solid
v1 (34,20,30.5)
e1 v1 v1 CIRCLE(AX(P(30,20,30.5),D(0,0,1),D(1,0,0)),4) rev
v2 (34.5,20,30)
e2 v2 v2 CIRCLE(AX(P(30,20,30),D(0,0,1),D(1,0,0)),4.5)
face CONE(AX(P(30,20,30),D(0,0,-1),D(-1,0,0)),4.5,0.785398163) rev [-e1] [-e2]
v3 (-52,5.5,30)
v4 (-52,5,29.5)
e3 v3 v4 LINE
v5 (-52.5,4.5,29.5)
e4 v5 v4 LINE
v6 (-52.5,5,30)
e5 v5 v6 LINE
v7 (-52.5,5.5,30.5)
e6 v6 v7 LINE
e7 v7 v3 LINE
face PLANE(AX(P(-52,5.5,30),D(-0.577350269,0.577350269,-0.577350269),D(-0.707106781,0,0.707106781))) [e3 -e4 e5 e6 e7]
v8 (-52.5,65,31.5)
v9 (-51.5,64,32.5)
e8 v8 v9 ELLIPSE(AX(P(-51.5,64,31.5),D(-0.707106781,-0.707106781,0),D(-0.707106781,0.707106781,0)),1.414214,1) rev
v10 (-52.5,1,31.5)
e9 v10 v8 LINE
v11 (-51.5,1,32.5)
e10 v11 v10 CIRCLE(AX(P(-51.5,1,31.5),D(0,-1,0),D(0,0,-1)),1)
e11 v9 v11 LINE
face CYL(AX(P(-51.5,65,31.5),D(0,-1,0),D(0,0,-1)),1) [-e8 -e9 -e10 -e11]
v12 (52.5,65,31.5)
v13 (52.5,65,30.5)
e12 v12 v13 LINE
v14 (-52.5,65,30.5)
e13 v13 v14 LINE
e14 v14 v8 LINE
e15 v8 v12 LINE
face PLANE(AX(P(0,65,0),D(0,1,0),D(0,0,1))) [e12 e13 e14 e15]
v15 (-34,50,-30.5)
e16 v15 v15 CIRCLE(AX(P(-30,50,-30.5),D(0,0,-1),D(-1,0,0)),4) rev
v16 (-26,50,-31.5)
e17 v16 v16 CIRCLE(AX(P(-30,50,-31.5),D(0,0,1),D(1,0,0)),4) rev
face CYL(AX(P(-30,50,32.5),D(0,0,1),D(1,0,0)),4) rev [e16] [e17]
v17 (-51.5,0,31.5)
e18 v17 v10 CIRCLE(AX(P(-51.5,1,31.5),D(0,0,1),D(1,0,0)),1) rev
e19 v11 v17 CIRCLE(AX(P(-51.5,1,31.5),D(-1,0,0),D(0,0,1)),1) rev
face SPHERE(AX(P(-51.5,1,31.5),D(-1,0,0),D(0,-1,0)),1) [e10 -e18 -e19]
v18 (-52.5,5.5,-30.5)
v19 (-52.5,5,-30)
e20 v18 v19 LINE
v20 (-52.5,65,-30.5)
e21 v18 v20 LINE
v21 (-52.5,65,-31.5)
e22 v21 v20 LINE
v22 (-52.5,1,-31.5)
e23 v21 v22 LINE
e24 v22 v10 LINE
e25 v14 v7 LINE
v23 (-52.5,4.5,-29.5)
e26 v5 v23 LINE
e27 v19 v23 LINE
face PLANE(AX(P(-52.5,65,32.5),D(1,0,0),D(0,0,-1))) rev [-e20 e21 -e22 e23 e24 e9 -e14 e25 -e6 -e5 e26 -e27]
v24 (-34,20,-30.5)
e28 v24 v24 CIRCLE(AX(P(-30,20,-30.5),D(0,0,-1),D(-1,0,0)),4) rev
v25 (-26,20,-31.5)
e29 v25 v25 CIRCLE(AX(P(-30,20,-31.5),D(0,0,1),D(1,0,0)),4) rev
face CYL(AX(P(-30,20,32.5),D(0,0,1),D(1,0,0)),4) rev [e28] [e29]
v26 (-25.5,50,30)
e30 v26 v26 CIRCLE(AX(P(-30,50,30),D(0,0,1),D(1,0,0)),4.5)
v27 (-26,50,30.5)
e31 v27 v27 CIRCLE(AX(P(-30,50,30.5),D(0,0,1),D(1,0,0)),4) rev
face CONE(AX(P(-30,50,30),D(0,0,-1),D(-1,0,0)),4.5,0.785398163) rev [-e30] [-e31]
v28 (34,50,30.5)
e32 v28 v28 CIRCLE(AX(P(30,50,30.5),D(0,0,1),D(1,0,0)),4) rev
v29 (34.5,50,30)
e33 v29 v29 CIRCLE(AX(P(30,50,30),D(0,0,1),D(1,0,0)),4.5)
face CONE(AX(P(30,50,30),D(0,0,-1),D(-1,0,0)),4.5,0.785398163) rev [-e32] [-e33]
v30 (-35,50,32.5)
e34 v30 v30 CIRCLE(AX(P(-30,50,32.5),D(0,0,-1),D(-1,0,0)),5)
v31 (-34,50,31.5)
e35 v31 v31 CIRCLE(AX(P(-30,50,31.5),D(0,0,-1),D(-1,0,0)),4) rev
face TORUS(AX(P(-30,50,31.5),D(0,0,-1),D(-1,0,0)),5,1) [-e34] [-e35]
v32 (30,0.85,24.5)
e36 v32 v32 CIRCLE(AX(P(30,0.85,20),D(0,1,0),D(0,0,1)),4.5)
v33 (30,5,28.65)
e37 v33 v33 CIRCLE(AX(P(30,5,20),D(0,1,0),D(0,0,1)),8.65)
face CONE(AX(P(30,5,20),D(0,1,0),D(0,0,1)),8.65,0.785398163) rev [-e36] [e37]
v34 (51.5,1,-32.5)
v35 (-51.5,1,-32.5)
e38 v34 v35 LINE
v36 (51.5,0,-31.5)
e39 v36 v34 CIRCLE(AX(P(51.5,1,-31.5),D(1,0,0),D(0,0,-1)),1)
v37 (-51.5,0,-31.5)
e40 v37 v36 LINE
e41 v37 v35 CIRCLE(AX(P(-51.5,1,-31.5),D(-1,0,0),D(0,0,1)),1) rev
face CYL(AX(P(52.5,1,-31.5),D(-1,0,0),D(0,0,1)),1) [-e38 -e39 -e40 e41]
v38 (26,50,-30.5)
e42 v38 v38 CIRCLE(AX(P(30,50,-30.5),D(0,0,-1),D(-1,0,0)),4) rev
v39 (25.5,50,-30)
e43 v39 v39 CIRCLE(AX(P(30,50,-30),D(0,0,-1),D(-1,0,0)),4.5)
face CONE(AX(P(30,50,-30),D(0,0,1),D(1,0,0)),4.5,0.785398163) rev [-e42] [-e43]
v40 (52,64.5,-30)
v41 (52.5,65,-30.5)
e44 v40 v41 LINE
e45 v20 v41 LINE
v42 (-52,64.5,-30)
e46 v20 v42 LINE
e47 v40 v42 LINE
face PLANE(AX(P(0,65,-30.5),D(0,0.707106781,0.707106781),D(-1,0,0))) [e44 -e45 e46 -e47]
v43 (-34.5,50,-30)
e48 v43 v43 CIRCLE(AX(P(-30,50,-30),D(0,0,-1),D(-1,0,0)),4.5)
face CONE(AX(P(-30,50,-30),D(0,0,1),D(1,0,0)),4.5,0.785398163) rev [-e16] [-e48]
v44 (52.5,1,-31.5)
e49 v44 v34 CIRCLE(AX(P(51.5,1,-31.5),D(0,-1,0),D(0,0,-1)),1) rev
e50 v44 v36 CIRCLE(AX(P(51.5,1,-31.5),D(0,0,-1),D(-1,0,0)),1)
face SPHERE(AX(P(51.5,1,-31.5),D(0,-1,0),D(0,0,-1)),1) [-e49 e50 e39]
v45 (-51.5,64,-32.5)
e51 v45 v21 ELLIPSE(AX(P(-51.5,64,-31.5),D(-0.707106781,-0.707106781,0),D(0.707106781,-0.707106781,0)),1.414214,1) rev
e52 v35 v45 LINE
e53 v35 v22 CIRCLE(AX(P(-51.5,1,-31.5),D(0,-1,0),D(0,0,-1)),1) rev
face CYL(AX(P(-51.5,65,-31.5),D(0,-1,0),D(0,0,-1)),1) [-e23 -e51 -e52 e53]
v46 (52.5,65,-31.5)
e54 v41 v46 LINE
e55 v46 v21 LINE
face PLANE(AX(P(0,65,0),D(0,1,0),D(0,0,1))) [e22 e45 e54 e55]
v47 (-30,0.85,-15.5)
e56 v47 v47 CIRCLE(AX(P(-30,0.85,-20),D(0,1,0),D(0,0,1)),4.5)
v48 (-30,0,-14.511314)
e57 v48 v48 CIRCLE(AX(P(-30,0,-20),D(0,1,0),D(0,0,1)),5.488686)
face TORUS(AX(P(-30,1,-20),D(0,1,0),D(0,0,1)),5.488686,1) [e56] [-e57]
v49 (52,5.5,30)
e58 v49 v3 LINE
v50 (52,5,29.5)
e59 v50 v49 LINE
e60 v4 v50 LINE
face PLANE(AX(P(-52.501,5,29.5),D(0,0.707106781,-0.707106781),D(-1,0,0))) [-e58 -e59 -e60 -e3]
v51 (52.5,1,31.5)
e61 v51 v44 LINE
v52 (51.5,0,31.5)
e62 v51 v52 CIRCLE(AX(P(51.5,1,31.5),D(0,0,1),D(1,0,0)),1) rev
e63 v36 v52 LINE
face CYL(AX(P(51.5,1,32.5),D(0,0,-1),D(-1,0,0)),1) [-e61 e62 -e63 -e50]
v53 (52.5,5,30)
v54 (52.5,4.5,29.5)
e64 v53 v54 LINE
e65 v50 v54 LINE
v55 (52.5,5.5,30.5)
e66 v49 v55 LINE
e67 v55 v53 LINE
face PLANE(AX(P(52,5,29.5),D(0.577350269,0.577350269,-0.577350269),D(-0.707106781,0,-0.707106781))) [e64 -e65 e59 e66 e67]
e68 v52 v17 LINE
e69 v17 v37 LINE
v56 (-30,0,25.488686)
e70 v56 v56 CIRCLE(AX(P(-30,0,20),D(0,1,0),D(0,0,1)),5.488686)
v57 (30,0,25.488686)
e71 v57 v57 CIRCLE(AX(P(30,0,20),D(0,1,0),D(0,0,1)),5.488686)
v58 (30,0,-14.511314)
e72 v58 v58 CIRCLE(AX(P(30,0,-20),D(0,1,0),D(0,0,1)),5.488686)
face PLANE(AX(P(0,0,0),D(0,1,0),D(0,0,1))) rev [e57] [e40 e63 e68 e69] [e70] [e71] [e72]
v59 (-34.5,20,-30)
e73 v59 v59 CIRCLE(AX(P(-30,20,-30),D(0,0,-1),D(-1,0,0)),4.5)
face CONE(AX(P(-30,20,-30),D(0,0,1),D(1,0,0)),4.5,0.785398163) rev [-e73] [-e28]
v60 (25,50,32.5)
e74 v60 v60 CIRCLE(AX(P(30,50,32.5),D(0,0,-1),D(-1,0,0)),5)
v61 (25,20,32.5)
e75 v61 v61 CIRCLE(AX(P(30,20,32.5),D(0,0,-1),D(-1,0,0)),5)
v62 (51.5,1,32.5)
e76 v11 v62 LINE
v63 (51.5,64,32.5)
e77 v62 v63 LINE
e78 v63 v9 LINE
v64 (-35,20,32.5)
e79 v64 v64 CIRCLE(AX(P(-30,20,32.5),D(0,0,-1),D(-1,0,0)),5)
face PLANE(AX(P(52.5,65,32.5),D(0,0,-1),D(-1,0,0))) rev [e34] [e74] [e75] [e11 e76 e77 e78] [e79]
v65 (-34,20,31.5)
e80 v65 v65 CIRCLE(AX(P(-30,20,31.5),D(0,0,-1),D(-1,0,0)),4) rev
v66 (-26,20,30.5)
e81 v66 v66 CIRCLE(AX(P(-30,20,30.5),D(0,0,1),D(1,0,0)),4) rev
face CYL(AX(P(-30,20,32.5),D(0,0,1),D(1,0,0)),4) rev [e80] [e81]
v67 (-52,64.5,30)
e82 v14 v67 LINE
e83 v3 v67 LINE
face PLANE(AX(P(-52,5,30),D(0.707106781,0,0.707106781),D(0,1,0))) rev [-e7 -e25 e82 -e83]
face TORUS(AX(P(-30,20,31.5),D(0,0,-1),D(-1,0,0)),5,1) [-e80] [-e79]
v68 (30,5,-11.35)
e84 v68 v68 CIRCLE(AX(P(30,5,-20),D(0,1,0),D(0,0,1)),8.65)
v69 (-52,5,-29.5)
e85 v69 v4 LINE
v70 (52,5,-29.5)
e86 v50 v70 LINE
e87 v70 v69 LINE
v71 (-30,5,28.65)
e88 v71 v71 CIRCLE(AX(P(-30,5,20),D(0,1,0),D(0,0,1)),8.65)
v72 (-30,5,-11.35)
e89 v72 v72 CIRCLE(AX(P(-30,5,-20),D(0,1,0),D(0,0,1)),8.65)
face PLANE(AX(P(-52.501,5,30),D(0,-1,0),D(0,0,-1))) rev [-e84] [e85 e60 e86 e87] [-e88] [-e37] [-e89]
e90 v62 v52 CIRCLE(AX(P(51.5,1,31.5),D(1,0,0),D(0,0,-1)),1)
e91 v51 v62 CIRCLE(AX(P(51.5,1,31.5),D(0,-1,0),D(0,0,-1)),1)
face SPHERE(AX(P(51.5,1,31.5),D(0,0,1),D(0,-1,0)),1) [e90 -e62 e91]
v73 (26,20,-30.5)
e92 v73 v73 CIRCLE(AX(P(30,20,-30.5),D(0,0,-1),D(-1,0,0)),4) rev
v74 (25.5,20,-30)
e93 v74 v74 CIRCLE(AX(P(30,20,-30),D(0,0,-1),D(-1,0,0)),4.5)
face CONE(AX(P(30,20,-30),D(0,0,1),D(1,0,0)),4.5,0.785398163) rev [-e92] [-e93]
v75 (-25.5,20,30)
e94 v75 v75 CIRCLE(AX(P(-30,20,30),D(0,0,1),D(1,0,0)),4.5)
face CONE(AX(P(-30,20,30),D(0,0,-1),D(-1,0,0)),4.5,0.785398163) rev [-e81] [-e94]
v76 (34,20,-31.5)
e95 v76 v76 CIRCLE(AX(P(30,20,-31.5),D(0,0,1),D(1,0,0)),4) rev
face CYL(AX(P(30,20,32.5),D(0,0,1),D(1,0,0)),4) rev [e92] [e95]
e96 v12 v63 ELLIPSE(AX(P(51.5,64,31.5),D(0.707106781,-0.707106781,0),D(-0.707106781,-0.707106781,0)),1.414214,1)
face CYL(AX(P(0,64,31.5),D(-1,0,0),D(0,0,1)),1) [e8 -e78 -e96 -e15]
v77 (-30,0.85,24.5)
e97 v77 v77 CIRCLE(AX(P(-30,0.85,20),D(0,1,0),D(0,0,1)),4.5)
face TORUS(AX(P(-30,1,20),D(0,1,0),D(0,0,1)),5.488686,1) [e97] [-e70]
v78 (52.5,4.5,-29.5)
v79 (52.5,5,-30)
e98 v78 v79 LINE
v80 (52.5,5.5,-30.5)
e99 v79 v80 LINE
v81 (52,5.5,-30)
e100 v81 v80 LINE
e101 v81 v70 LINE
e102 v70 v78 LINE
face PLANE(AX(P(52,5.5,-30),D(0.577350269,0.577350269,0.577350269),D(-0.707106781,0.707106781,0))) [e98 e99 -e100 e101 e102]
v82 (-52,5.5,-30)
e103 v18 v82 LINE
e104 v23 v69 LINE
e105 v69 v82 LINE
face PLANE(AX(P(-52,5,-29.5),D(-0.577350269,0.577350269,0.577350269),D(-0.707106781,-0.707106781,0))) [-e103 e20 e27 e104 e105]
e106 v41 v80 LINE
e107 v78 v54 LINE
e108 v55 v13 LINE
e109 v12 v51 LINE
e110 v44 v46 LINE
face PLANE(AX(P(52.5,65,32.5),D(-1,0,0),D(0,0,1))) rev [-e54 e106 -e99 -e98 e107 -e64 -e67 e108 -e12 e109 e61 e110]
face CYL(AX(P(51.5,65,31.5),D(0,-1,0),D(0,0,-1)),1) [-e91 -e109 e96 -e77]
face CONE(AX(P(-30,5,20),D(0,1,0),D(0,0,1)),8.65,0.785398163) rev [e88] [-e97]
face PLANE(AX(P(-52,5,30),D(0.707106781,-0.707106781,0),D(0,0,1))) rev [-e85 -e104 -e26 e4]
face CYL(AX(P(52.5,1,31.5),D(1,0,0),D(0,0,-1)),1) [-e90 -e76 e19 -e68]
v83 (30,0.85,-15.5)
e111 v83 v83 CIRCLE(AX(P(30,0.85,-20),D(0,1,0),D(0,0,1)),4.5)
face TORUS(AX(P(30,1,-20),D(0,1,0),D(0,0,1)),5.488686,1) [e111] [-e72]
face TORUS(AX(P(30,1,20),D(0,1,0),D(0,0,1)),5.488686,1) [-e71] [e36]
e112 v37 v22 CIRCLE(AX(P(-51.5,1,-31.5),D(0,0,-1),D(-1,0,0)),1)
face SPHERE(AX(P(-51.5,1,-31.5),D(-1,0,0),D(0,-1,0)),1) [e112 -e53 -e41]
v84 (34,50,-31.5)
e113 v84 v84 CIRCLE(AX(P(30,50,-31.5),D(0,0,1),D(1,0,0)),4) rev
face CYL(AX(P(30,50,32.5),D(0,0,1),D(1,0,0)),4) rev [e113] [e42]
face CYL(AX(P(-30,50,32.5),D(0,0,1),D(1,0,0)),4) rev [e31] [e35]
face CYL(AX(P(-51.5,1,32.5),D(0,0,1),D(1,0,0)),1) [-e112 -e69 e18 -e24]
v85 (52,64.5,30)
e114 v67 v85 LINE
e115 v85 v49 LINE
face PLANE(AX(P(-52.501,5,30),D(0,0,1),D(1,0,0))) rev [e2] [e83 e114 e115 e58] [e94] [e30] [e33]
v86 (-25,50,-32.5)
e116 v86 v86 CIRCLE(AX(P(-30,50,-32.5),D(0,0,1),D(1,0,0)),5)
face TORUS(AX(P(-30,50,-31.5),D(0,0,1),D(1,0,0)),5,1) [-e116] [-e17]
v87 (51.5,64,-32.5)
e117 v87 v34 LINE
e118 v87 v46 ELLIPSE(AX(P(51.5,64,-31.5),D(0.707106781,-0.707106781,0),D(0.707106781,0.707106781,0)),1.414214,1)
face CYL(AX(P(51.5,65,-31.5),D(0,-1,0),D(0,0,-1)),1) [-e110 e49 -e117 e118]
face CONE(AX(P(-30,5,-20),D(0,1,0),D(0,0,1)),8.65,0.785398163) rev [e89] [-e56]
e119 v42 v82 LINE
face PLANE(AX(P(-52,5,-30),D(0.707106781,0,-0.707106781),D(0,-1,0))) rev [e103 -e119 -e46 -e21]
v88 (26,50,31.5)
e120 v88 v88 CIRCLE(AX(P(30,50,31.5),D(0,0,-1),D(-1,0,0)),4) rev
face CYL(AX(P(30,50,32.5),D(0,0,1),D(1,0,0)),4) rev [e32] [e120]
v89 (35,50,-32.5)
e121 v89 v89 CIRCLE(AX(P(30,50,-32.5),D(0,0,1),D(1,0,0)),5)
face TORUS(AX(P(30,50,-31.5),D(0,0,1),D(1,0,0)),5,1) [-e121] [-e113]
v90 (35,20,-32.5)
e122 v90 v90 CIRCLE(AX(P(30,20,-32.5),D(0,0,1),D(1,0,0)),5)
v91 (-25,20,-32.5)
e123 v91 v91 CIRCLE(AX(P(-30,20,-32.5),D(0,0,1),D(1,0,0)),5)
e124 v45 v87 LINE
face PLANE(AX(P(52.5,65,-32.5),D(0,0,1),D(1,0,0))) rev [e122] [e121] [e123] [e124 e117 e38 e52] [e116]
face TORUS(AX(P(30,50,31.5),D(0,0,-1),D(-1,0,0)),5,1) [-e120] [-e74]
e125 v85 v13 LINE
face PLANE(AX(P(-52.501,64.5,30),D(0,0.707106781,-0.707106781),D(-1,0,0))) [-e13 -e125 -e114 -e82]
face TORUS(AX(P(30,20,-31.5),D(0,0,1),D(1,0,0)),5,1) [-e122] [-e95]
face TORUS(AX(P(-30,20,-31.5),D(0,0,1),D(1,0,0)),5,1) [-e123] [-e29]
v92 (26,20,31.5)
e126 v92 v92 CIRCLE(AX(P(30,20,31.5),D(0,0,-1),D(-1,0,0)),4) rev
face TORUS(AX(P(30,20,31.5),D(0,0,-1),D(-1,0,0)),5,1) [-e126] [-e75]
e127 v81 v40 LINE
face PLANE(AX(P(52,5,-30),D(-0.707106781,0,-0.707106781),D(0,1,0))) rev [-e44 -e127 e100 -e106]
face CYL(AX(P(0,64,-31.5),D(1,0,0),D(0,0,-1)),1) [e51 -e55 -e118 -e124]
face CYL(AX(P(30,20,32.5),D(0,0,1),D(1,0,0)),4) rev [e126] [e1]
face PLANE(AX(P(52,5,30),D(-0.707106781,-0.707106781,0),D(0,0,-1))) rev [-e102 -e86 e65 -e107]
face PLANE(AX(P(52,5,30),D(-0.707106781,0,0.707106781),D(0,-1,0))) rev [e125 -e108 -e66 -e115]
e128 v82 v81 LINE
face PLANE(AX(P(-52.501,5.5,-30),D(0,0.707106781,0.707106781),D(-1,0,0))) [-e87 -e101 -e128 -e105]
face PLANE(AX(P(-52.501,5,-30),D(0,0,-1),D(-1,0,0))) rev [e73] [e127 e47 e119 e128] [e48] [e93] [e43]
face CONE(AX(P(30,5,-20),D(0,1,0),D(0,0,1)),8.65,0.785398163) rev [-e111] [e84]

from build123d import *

# Parameters (mm, degrees)
SZKIC1_W                    = 105
SZKIC1_H                    = 65
DODANIE_WYCI_GNI_CIE1_DEPTH = 65
WYTNIJ_WYCI_GNI_CIE1_REACH  = 129.696
SZKIC2_W                    = 60
SZKIC2_H                    = 60
OTWORY_USTALAJ_CE_8_0MM2_D  = 8
ZAOKR_GLENIE1_R             = 1
SFAZOWANIE1_SIZE            = 0.5


with BuildPart() as part:
    # Szkic1 → Dodanie-wyciągnięcie1 (new body)
    with BuildSketch(Plane(origin=(0, 0, 0), x_dir=(1, 0, 0), z_dir=(0, 1, 0))):
        Rectangle(SZKIC1_W, SZKIC1_H)
    extrude(amount=DODANIE_WYCI_GNI_CIE1_DEPTH)

    # Szkic2 → Wytnij-wyciągnięcie1 (cut, up to next)
    with BuildSketch(Plane(origin=(52.5, 0, 0), x_dir=(0, 0, -1), z_dir=(1, 0, 0)), mode=Mode.PRIVATE) as wytnij_wyci_gni_cie1_sk1:
        with Locations((0, 35)):
            Rectangle(SZKIC2_W, SZKIC2_H)
    wytnij_wyci_gni_cie1_tool1 = extrude(wytnij_wyci_gni_cie1_sk1.sketch, amount=-WYTNIJ_WYCI_GNI_CIE1_REACH, mode=Mode.PRIVATE) & part.part
    add(wytnij_wyci_gni_cie1_tool1.solids().sort_by_distance((52.5, 35, 0))[0], mode=Mode.SUBTRACT)

    # Szkic5 → Pogłębienie stożkowe pod M8 Śrubę z łbem soczewkowym1 (revolve, cut)
    with BuildSketch(Plane(origin=(-30, 5, -20), x_dir=(0, 0, 1), z_dir=(1, 0, 0))):
        Polygon((0, 0), (0, 5), (4.5, 5), (4.5, 4.15), (8.65, 0), align=None)
    pog_bienie_sto_kowe_pod_m8_rub_z_bem = revolve(axis=Axis((-30, 11.35, -20), (0, -1, 0)), mode=Mode.SUBTRACT)

    # Lustro1: Pogłębienie stożkowe pod M8 Śrubę z łbem soczewkowym1 across plane
    add(pog_bienie_sto_kowe_pod_m8_rub_z_bem.mirror(Plane(origin=(0, 0, 0), x_dir=(0, 0, 1), z_dir=(1, 0, 0))), mode=Mode.SUBTRACT)

    # Lustro2: Pogłębienie stożkowe pod M8 Śrubę z łbem soczewkowym1 across plane
    add(pog_bienie_sto_kowe_pod_m8_rub_z_bem.mirror(Plane.XY), mode=Mode.SUBTRACT)

    # Lustro2 copy 1 sketch → Lustro2 copy 1 (revolve, cut)
    with BuildSketch(Plane(origin=(30, 5, 20), x_dir=(0, 0, -1), z_dir=(-1, 0, 0))):
        Polygon((0, 0), (0, 5), (4.5, 5), (4.5, 4.15), (8.65, 0), align=None)
    revolve(axis=Axis((30, 11.35, 20), (0, -1, 0)), mode=Mode.SUBTRACT)

    # Otwory ustalające Ø8.0mm2 (through all)
    with Locations(Plane.XY.offset(32.5)):
        with Locations((-30, 50), (30, 50), (30, 20), (-30, 20)):
            Hole(OTWORY_USTALAJ_CE_8_0MM2_D / 2)

    # Zaokrąglenie1
    # the kernel refuses this fillet: 1 mm, written as the material it takes off along each edge
    with BuildSketch(Plane(origin=(-51.5, 1, -31.5), x_dir=(-1, 0, 0), z_dir=(0, -1, 0))) as zaokr_glenie1_piece_1_section:
        Polygon((0, 0), (ZAOKR_GLENIE1_R * 1.02, 0), (ZAOKR_GLENIE1_R * 1.02, ZAOKR_GLENIE1_R * 1.02), (0, ZAOKR_GLENIE1_R * 1.02), align=None)
    zaokr_glenie1_piece_1 = extrude(amount=ZAOKR_GLENIE1_R * 1.02, mode=Mode.PRIVATE)
    zaokr_glenie1_piece_1 = zaokr_glenie1_piece_1 - Plane(origin=(-51.5, 1, -31.5), x_dir=(0.7071067811865477, 0, 0.7071067811865475), z_dir=(0, -1, 0)) * Sphere(ZAOKR_GLENIE1_R, mode=Mode.PRIVATE)
    add(zaokr_glenie1_piece_1, mode=Mode.SUBTRACT)
    with BuildSketch(Plane(origin=(51.5, 1, -31.5), x_dir=(0, -1, 0), z_dir=(1, 0, 0))) as zaokr_glenie1_piece_2_section:
        Polygon((0, 0), (ZAOKR_GLENIE1_R * 1.02, 0), (ZAOKR_GLENIE1_R * 1.02, ZAOKR_GLENIE1_R * 1.02), (0, ZAOKR_GLENIE1_R * 1.02), align=None)
    zaokr_glenie1_piece_2 = extrude(amount=ZAOKR_GLENIE1_R * 1.02, mode=Mode.PRIVATE)
    zaokr_glenie1_piece_2 = zaokr_glenie1_piece_2 - Plane(origin=(51.5, 1, -31.5), x_dir=(0, 0.7071067811865475, 0.7071067811865475), z_dir=(1, 0, 0)) * Sphere(ZAOKR_GLENIE1_R, mode=Mode.PRIVATE)
    add(zaokr_glenie1_piece_2, mode=Mode.SUBTRACT)
    with BuildSketch(Plane(origin=(51.5, 1, 31.5), x_dir=(1, 0, 0), z_dir=(0, 0, 1))) as zaokr_glenie1_piece_3_section:
        Polygon((0, 0), (ZAOKR_GLENIE1_R * 1.02, 0), (ZAOKR_GLENIE1_R * 1.02, -ZAOKR_GLENIE1_R * 1.02), (0, -ZAOKR_GLENIE1_R * 1.02), align=None)
    zaokr_glenie1_piece_3 = extrude(amount=ZAOKR_GLENIE1_R * 1.02, mode=Mode.PRIVATE)
    zaokr_glenie1_piece_3 = zaokr_glenie1_piece_3 - Plane(origin=(51.5, 1, 31.5), x_dir=(-0.7071067811865475, 0.7071067811865475, 0), z_dir=(0, 0, 1)) * Sphere(ZAOKR_GLENIE1_R, mode=Mode.PRIVATE)
    add(zaokr_glenie1_piece_3, mode=Mode.SUBTRACT)
    with BuildSketch(Plane(origin=(-51.5, 1, 31.5), x_dir=(0, -1, 0), z_dir=(0, 0, 1))) as zaokr_glenie1_piece_4_section:
        Polygon((0, 0), (ZAOKR_GLENIE1_R * 1.02, 0), (ZAOKR_GLENIE1_R * 1.02, -ZAOKR_GLENIE1_R * 1.02), (0, -ZAOKR_GLENIE1_R * 1.02), align=None)
    zaokr_glenie1_piece_4 = extrude(amount=ZAOKR_GLENIE1_R * 1.02, mode=Mode.PRIVATE)
    zaokr_glenie1_piece_4 = zaokr_glenie1_piece_4 - Plane(origin=(-51.5, 1, 31.5), x_dir=(0.7071067811865475, 0.7071067811865475, 0), z_dir=(0, 0, 1)) * Sphere(ZAOKR_GLENIE1_R, mode=Mode.PRIVATE)
    add(zaokr_glenie1_piece_4, mode=Mode.SUBTRACT)
    with BuildSketch(Plane(origin=(-55, 65, -32.5), x_dir=(0, 0, 1), z_dir=(1, 0, 0))) as zaokr_glenie1_piece_5:
        with BuildLine():
            CenterArc((ZAOKR_GLENIE1_R, ZAOKR_GLENIE1_R), ZAOKR_GLENIE1_R, 180, 90)
            Line((0, ZAOKR_GLENIE1_R), (-ZAOKR_GLENIE1_R * 0.02, ZAOKR_GLENIE1_R))
            Line((-ZAOKR_GLENIE1_R * 0.02, ZAOKR_GLENIE1_R), (-ZAOKR_GLENIE1_R * 0.02, -ZAOKR_GLENIE1_R * 0.02))
            Line((-ZAOKR_GLENIE1_R * 0.02, -ZAOKR_GLENIE1_R * 0.02), (ZAOKR_GLENIE1_R, -ZAOKR_GLENIE1_R * 0.02))
            Line((ZAOKR_GLENIE1_R, -ZAOKR_GLENIE1_R * 0.02), (ZAOKR_GLENIE1_R, 0))
        make_face()
    extrude(amount=110, mode=Mode.SUBTRACT)
    with BuildSketch(Plane(origin=(-30, 0, -20), x_dir=(0, 0, 1), z_dir=(1, 0, 0))) as zaokr_glenie1_piece_6:
        with BuildLine():
            CenterArc((5.488685997, -1), ZAOKR_GLENIE1_R, 90, 81.373073441)
            Line((4.5, -0.85), (4.48022628, -0.847))
            ThreePointArc((4.48022628, -0.847), (4.48, -0.425), (4.48, 0))
            Line((4.48, 0), (4.5, 0.02))
            Line((4.5, 0.02), (5.488685997, 0.02))
            Line((5.488685997, 0.02), (5.488685997, 0))
        make_face()
    revolve(axis=Axis((-30, 0, -20), (0, -1, 0)), mode=Mode.SUBTRACT)
    with BuildSketch(Plane(origin=(30, 0, -20), x_dir=(0, 0, 1), z_dir=(-1, 0, 0))) as zaokr_glenie1_piece_7:
        with BuildLine():
            CenterArc((5.488685997, 1), ZAOKR_GLENIE1_R, 188.626926559, 81.373073441)
            Line((4.5, 0.85), (4.48022628, 0.847))
            ThreePointArc((4.48022628, 0.847), (4.48, 0.425), (4.48, 0))
            Line((4.48, 0), (4.5, -0.02))
            Line((4.5, -0.02), (5.488685997, -0.02))
            Line((5.488685997, -0.02), (5.488685997, 0))
        make_face()
    revolve(axis=Axis((30, 0, -20), (0, 1, 0)), mode=Mode.SUBTRACT)
    with BuildSketch(Plane(origin=(30, 0, 20), x_dir=(0, 0, -1), z_dir=(-1, 0, 0))) as zaokr_glenie1_piece_8:
        with BuildLine():
            CenterArc((5.488685997, -1), ZAOKR_GLENIE1_R, 90, 81.373073441)
            Line((4.5, -0.85), (4.48022628, -0.847))
            ThreePointArc((4.48022628, -0.847), (4.48, -0.425), (4.48, 0))
            Line((4.48, 0), (4.5, 0.02))
            Line((4.5, 0.02), (5.488685997, 0.02))
            Line((5.488685997, 0.02), (5.488685997, 0))
        make_face()
    revolve(axis=Axis((30, 0, 20), (0, -1, 0)), mode=Mode.SUBTRACT)
    with BuildSketch(Plane(origin=(-30, 0, 20), x_dir=(0, 0, -1), z_dir=(1, 0, 0))) as zaokr_glenie1_piece_9:
        with BuildLine():
            CenterArc((5.488685997, 1), ZAOKR_GLENIE1_R, 188.626926559, 81.373073441)
            Line((4.5, 0.85), (4.48022628, 0.847))
            ThreePointArc((4.48022628, 0.847), (4.48, 0.425), (4.48, 0))
            Line((4.48, 0), (4.5, -0.02))
            Line((4.5, -0.02), (5.488685997, -0.02))
            Line((5.488685997, -0.02), (5.488685997, 0))
        make_face()
    revolve(axis=Axis((-30, 0, 20), (0, 1, 0)), mode=Mode.SUBTRACT)
    with BuildSketch(Plane(origin=(-51.5, 0, -32.5), x_dir=(0, 0, 1), z_dir=(1, 0, 0))) as zaokr_glenie1_piece_10:
        with BuildLine():
            CenterArc((ZAOKR_GLENIE1_R, -ZAOKR_GLENIE1_R), ZAOKR_GLENIE1_R, 90, 90)
            Line((0, -ZAOKR_GLENIE1_R), (-ZAOKR_GLENIE1_R * 0.02, -ZAOKR_GLENIE1_R))
            Line((-ZAOKR_GLENIE1_R * 0.02, -ZAOKR_GLENIE1_R), (-ZAOKR_GLENIE1_R * 0.02, ZAOKR_GLENIE1_R * 0.02))
            Line((-ZAOKR_GLENIE1_R * 0.02, ZAOKR_GLENIE1_R * 0.02), (ZAOKR_GLENIE1_R, ZAOKR_GLENIE1_R * 0.02))
            Line((ZAOKR_GLENIE1_R, ZAOKR_GLENIE1_R * 0.02), (ZAOKR_GLENIE1_R, 0))
        make_face()
    extrude(amount=103, mode=Mode.SUBTRACT)
    with BuildSketch(Plane(origin=(52.5, 0, -31.5), x_dir=(0, 1, 0), z_dir=(0, 0, 1))) as zaokr_glenie1_piece_11:
        with BuildLine():
            CenterArc((ZAOKR_GLENIE1_R, ZAOKR_GLENIE1_R), ZAOKR_GLENIE1_R, 180, 90)
            Line((0, ZAOKR_GLENIE1_R), (-ZAOKR_GLENIE1_R * 0.02, ZAOKR_GLENIE1_R))
            Line((-ZAOKR_GLENIE1_R * 0.02, ZAOKR_GLENIE1_R), (-ZAOKR_GLENIE1_R * 0.02, -ZAOKR_GLENIE1_R * 0.02))
            Line((-ZAOKR_GLENIE1_R * 0.02, -ZAOKR_GLENIE1_R * 0.02), (ZAOKR_GLENIE1_R, -ZAOKR_GLENIE1_R * 0.02))
            Line((ZAOKR_GLENIE1_R, -ZAOKR_GLENIE1_R * 0.02), (ZAOKR_GLENIE1_R, 0))
        make_face()
    extrude(amount=63, mode=Mode.SUBTRACT)
    with BuildSketch(Plane(origin=(51.5, 0, 32.5), x_dir=(0, 1, 0), z_dir=(-1, 0, 0))) as zaokr_glenie1_piece_12:
        with BuildLine():
            CenterArc((ZAOKR_GLENIE1_R, ZAOKR_GLENIE1_R), ZAOKR_GLENIE1_R, 180, 90)
            Line((0, ZAOKR_GLENIE1_R), (-ZAOKR_GLENIE1_R * 0.02, ZAOKR_GLENIE1_R))
            Line((-ZAOKR_GLENIE1_R * 0.02, ZAOKR_GLENIE1_R), (-ZAOKR_GLENIE1_R * 0.02, -ZAOKR_GLENIE1_R * 0.02))
            Line((-ZAOKR_GLENIE1_R * 0.02, -ZAOKR_GLENIE1_R * 0.02), (ZAOKR_GLENIE1_R, -ZAOKR_GLENIE1_R * 0.02))
            Line((ZAOKR_GLENIE1_R, -ZAOKR_GLENIE1_R * 0.02), (ZAOKR_GLENIE1_R, 0))
        make_face()
    extrude(amount=103, mode=Mode.SUBTRACT)
    with BuildSketch(Plane(origin=(-30, 20, -32.5), x_dir=(-1, 0, 0), z_dir=(0, -1, 0))) as zaokr_glenie1_piece_13:
        with BuildLine():
            CenterArc((4 + ZAOKR_GLENIE1_R, -ZAOKR_GLENIE1_R), ZAOKR_GLENIE1_R, 90, 90)
            Line((4, -ZAOKR_GLENIE1_R), (4 - ZAOKR_GLENIE1_R * 0.02, -ZAOKR_GLENIE1_R))
            Line((4 - ZAOKR_GLENIE1_R * 0.02, -ZAOKR_GLENIE1_R), (4 - ZAOKR_GLENIE1_R * 0.02, ZAOKR_GLENIE1_R * 0.02))
            Line((4 - ZAOKR_GLENIE1_R * 0.02, ZAOKR_GLENIE1_R * 0.02), (4 + ZAOKR_GLENIE1_R, ZAOKR_GLENIE1_R * 0.02))
            Line((4 + ZAOKR_GLENIE1_R, ZAOKR_GLENIE1_R * 0.02), (4 + ZAOKR_GLENIE1_R, 0))
        make_face()
    revolve(axis=Axis((-30, 20, -32.5), (0, 0, -1)), mode=Mode.SUBTRACT)
    with BuildSketch(Plane(origin=(-30, 20, 32.5), x_dir=(-1, 0, 0), z_dir=(0, -1, 0))) as zaokr_glenie1_piece_14:
        with BuildLine():
            CenterArc((4 + ZAOKR_GLENIE1_R, ZAOKR_GLENIE1_R), ZAOKR_GLENIE1_R, 180, 90)
            Line((4, ZAOKR_GLENIE1_R), (4 - ZAOKR_GLENIE1_R * 0.02, ZAOKR_GLENIE1_R))
            Line((4 - ZAOKR_GLENIE1_R * 0.02, ZAOKR_GLENIE1_R), (4 - ZAOKR_GLENIE1_R * 0.02, -ZAOKR_GLENIE1_R * 0.02))
            Line((4 - ZAOKR_GLENIE1_R * 0.02, -ZAOKR_GLENIE1_R * 0.02), (4 + ZAOKR_GLENIE1_R, -ZAOKR_GLENIE1_R * 0.02))
            Line((4 + ZAOKR_GLENIE1_R, -ZAOKR_GLENIE1_R * 0.02), (4 + ZAOKR_GLENIE1_R, 0))
        make_face()
    revolve(axis=Axis((-30, 20, 32.5), (0, 0, -1)), mode=Mode.SUBTRACT)
    with BuildSketch(Plane(origin=(-52.5, 0, 31.5), x_dir=(1, 0, 0), z_dir=(0, 0, -1))) as zaokr_glenie1_piece_15:
        with BuildLine():
            CenterArc((ZAOKR_GLENIE1_R, -ZAOKR_GLENIE1_R), ZAOKR_GLENIE1_R, 90, 90)
            Line((0, -ZAOKR_GLENIE1_R), (-ZAOKR_GLENIE1_R * 0.02, -ZAOKR_GLENIE1_R))
            Line((-ZAOKR_GLENIE1_R * 0.02, -ZAOKR_GLENIE1_R), (-ZAOKR_GLENIE1_R * 0.02, ZAOKR_GLENIE1_R * 0.02))
            Line((-ZAOKR_GLENIE1_R * 0.02, ZAOKR_GLENIE1_R * 0.02), (ZAOKR_GLENIE1_R, ZAOKR_GLENIE1_R * 0.02))
            Line((ZAOKR_GLENIE1_R, ZAOKR_GLENIE1_R * 0.02), (ZAOKR_GLENIE1_R, 0))
        make_face()
    extrude(amount=63, mode=Mode.SUBTRACT)
    with BuildSketch(Plane(origin=(30, 20, -32.5), x_dir=(-1, 0, 0), z_dir=(0, -1, 0))) as zaokr_glenie1_piece_16:
        with BuildLine():
            CenterArc((4 + ZAOKR_GLENIE1_R, -ZAOKR_GLENIE1_R), ZAOKR_GLENIE1_R, 90, 90)
            Line((4, -ZAOKR_GLENIE1_R), (4 - ZAOKR_GLENIE1_R * 0.02, -ZAOKR_GLENIE1_R))
            Line((4 - ZAOKR_GLENIE1_R * 0.02, -ZAOKR_GLENIE1_R), (4 - ZAOKR_GLENIE1_R * 0.02, ZAOKR_GLENIE1_R * 0.02))
            Line((4 - ZAOKR_GLENIE1_R * 0.02, ZAOKR_GLENIE1_R * 0.02), (4 + ZAOKR_GLENIE1_R, ZAOKR_GLENIE1_R * 0.02))
            Line((4 + ZAOKR_GLENIE1_R, ZAOKR_GLENIE1_R * 0.02), (4 + ZAOKR_GLENIE1_R, 0))
        make_face()
    revolve(axis=Axis((30, 20, -32.5), (0, 0, -1)), mode=Mode.SUBTRACT)
    with BuildSketch(Plane(origin=(30, 20, 32.5), x_dir=(-1, 0, 0), z_dir=(0, -1, 0))) as zaokr_glenie1_piece_17:
        with BuildLine():
            CenterArc((4 + ZAOKR_GLENIE1_R, ZAOKR_GLENIE1_R), ZAOKR_GLENIE1_R, 180, 90)
            Line((4, ZAOKR_GLENIE1_R), (4 - ZAOKR_GLENIE1_R * 0.02, ZAOKR_GLENIE1_R))
            Line((4 - ZAOKR_GLENIE1_R * 0.02, ZAOKR_GLENIE1_R), (4 - ZAOKR_GLENIE1_R * 0.02, -ZAOKR_GLENIE1_R * 0.02))
            Line((4 - ZAOKR_GLENIE1_R * 0.02, -ZAOKR_GLENIE1_R * 0.02), (4 + ZAOKR_GLENIE1_R, -ZAOKR_GLENIE1_R * 0.02))
            Line((4 + ZAOKR_GLENIE1_R, -ZAOKR_GLENIE1_R * 0.02), (4 + ZAOKR_GLENIE1_R, 0))
        make_face()
    revolve(axis=Axis((30, 20, 32.5), (0, 0, -1)), mode=Mode.SUBTRACT)
    with BuildSketch(Plane(origin=(30, 50, -32.5), x_dir=(-1, 0, 0), z_dir=(0, -1, 0))) as zaokr_glenie1_piece_18:
        with BuildLine():
            CenterArc((4 + ZAOKR_GLENIE1_R, -ZAOKR_GLENIE1_R), ZAOKR_GLENIE1_R, 90, 90)
            Line((4, -ZAOKR_GLENIE1_R), (4 - ZAOKR_GLENIE1_R * 0.02, -ZAOKR_GLENIE1_R))
            Line((4 - ZAOKR_GLENIE1_R * 0.02, -ZAOKR_GLENIE1_R), (4 - ZAOKR_GLENIE1_R * 0.02, ZAOKR_GLENIE1_R * 0.02))
            Line((4 - ZAOKR_GLENIE1_R * 0.02, ZAOKR_GLENIE1_R * 0.02), (4 + ZAOKR_GLENIE1_R, ZAOKR_GLENIE1_R * 0.02))
            Line((4 + ZAOKR_GLENIE1_R, ZAOKR_GLENIE1_R * 0.02), (4 + ZAOKR_GLENIE1_R, 0))
        make_face()
    revolve(axis=Axis((30, 50, -32.5), (0, 0, -1)), mode=Mode.SUBTRACT)
    with BuildSketch(Plane(origin=(30, 50, 32.5), x_dir=(-1, 0, 0), z_dir=(0, -1, 0))) as zaokr_glenie1_piece_19:
        with BuildLine():
            CenterArc((4 + ZAOKR_GLENIE1_R, ZAOKR_GLENIE1_R), ZAOKR_GLENIE1_R, 180, 90)
            Line((4, ZAOKR_GLENIE1_R), (4 - ZAOKR_GLENIE1_R * 0.02, ZAOKR_GLENIE1_R))
            Line((4 - ZAOKR_GLENIE1_R * 0.02, ZAOKR_GLENIE1_R), (4 - ZAOKR_GLENIE1_R * 0.02, -ZAOKR_GLENIE1_R * 0.02))
            Line((4 - ZAOKR_GLENIE1_R * 0.02, -ZAOKR_GLENIE1_R * 0.02), (4 + ZAOKR_GLENIE1_R, -ZAOKR_GLENIE1_R * 0.02))
            Line((4 + ZAOKR_GLENIE1_R, -ZAOKR_GLENIE1_R * 0.02), (4 + ZAOKR_GLENIE1_R, 0))
        make_face()
    revolve(axis=Axis((30, 50, 32.5), (0, 0, -1)), mode=Mode.SUBTRACT)
    with BuildSketch(Plane(origin=(-52.5, 1, -32.5), x_dir=(0, 0, 1), z_dir=(0, 1, 0)), Plane(origin=(-52.5, 1, 32.5), x_dir=(1, 0, 0), z_dir=(0, 1, 0))) as zaokr_glenie1_piece_20:
        with BuildLine():
            CenterArc((ZAOKR_GLENIE1_R, ZAOKR_GLENIE1_R), ZAOKR_GLENIE1_R, 180, 90)
            Line((0, ZAOKR_GLENIE1_R), (-ZAOKR_GLENIE1_R * 0.02, ZAOKR_GLENIE1_R))
            Line((-ZAOKR_GLENIE1_R * 0.02, ZAOKR_GLENIE1_R), (-ZAOKR_GLENIE1_R * 0.02, -ZAOKR_GLENIE1_R * 0.02))
            Line((-ZAOKR_GLENIE1_R * 0.02, -ZAOKR_GLENIE1_R * 0.02), (ZAOKR_GLENIE1_R, -ZAOKR_GLENIE1_R * 0.02))
            Line((ZAOKR_GLENIE1_R, -ZAOKR_GLENIE1_R * 0.02), (ZAOKR_GLENIE1_R, 0))
        make_face()
    extrude(amount=66.5, mode=Mode.SUBTRACT)
    with BuildSketch(Plane(origin=(52.5, 1, -32.5), x_dir=(0, 0, 1), z_dir=(0, 1, 0)), Plane(origin=(52.5, 1, 32.5), x_dir=(-1, 0, 0), z_dir=(0, 1, 0))) as zaokr_glenie1_piece_21:
        with BuildLine():
            CenterArc((ZAOKR_GLENIE1_R, -ZAOKR_GLENIE1_R), ZAOKR_GLENIE1_R, 90, 90)
            Line((0, -ZAOKR_GLENIE1_R), (-ZAOKR_GLENIE1_R * 0.02, -ZAOKR_GLENIE1_R))
            Line((-ZAOKR_GLENIE1_R * 0.02, -ZAOKR_GLENIE1_R), (-ZAOKR_GLENIE1_R * 0.02, ZAOKR_GLENIE1_R * 0.02))
            Line((-ZAOKR_GLENIE1_R * 0.02, ZAOKR_GLENIE1_R * 0.02), (ZAOKR_GLENIE1_R, ZAOKR_GLENIE1_R * 0.02))
            Line((ZAOKR_GLENIE1_R, ZAOKR_GLENIE1_R * 0.02), (ZAOKR_GLENIE1_R, 0))
        make_face()
    extrude(amount=66.5, mode=Mode.SUBTRACT)
    with BuildSketch(Plane(origin=(-30, 50, -32.5), x_dir=(-1, 0, 0), z_dir=(0, -1, 0))) as zaokr_glenie1_piece_22:
        with BuildLine():
            CenterArc((4 + ZAOKR_GLENIE1_R, -ZAOKR_GLENIE1_R), ZAOKR_GLENIE1_R, 90, 90)
            Line((4, -ZAOKR_GLENIE1_R), (4 - ZAOKR_GLENIE1_R * 0.02, -ZAOKR_GLENIE1_R))
            Line((4 - ZAOKR_GLENIE1_R * 0.02, -ZAOKR_GLENIE1_R), (4 - ZAOKR_GLENIE1_R * 0.02, ZAOKR_GLENIE1_R * 0.02))
            Line((4 - ZAOKR_GLENIE1_R * 0.02, ZAOKR_GLENIE1_R * 0.02), (4 + ZAOKR_GLENIE1_R, ZAOKR_GLENIE1_R * 0.02))
            Line((4 + ZAOKR_GLENIE1_R, ZAOKR_GLENIE1_R * 0.02), (4 + ZAOKR_GLENIE1_R, 0))
        make_face()
    revolve(axis=Axis((-30, 50, -32.5), (0, 0, -1)), mode=Mode.SUBTRACT)
    with BuildSketch(Plane(origin=(-30, 50, 32.5), x_dir=(-1, 0, 0), z_dir=(0, -1, 0))) as zaokr_glenie1_piece_23:
        with BuildLine():
            CenterArc((4 + ZAOKR_GLENIE1_R, ZAOKR_GLENIE1_R), ZAOKR_GLENIE1_R, 180, 90)
            Line((4, ZAOKR_GLENIE1_R), (4 - ZAOKR_GLENIE1_R * 0.02, ZAOKR_GLENIE1_R))
            Line((4 - ZAOKR_GLENIE1_R * 0.02, ZAOKR_GLENIE1_R), (4 - ZAOKR_GLENIE1_R * 0.02, -ZAOKR_GLENIE1_R * 0.02))
            Line((4 - ZAOKR_GLENIE1_R * 0.02, -ZAOKR_GLENIE1_R * 0.02), (4 + ZAOKR_GLENIE1_R, -ZAOKR_GLENIE1_R * 0.02))
            Line((4 + ZAOKR_GLENIE1_R, -ZAOKR_GLENIE1_R * 0.02), (4 + ZAOKR_GLENIE1_R, 0))
        make_face()
    revolve(axis=Axis((-30, 50, 32.5), (0, 0, -1)), mode=Mode.SUBTRACT)
    with BuildSketch(Plane(origin=(55, 65, 32.5), x_dir=(0, -1, 0), z_dir=(-1, 0, 0))) as zaokr_glenie1_piece_24:
        with BuildLine():
            CenterArc((ZAOKR_GLENIE1_R, -ZAOKR_GLENIE1_R), ZAOKR_GLENIE1_R, 90, 90)
            Line((0, -ZAOKR_GLENIE1_R), (-ZAOKR_GLENIE1_R * 0.02, -ZAOKR_GLENIE1_R))
            Line((-ZAOKR_GLENIE1_R * 0.02, -ZAOKR_GLENIE1_R), (-ZAOKR_GLENIE1_R * 0.02, ZAOKR_GLENIE1_R * 0.02))
            Line((-ZAOKR_GLENIE1_R * 0.02, ZAOKR_GLENIE1_R * 0.02), (ZAOKR_GLENIE1_R, ZAOKR_GLENIE1_R * 0.02))
            Line((ZAOKR_GLENIE1_R, ZAOKR_GLENIE1_R * 0.02), (ZAOKR_GLENIE1_R, 0))
        make_face()
    extrude(amount=110, mode=Mode.SUBTRACT)

    # Sfazowanie1
    sfazowanie1_edges = [part.edges().sort_by_distance(p)[0] for p in [
        (0, 65, -30),
        (0, 5, -30),
        (0, 5, 30),
        (0, 65, 30),
        (52.5, 35, -30),
        (52.5, 35, 30),
        (52.5, 5, 0),
        (-52.5, 35, -30),
        (-52.5, 5, 0),
        (-52.5, 35, 30),
        (-26, 20, 30),
        (-26, 20, -30),
        (34, 20, 30),
        (34, 20, -30),
        (34, 50, 30),
        (34, 50, -30),
        (-26, 50, 30),
        (-26, 50, -30),
    ]]
    chamfer(sfazowanie1_edges, length=SFAZOWANIE1_SIZE)


solid = part.part
